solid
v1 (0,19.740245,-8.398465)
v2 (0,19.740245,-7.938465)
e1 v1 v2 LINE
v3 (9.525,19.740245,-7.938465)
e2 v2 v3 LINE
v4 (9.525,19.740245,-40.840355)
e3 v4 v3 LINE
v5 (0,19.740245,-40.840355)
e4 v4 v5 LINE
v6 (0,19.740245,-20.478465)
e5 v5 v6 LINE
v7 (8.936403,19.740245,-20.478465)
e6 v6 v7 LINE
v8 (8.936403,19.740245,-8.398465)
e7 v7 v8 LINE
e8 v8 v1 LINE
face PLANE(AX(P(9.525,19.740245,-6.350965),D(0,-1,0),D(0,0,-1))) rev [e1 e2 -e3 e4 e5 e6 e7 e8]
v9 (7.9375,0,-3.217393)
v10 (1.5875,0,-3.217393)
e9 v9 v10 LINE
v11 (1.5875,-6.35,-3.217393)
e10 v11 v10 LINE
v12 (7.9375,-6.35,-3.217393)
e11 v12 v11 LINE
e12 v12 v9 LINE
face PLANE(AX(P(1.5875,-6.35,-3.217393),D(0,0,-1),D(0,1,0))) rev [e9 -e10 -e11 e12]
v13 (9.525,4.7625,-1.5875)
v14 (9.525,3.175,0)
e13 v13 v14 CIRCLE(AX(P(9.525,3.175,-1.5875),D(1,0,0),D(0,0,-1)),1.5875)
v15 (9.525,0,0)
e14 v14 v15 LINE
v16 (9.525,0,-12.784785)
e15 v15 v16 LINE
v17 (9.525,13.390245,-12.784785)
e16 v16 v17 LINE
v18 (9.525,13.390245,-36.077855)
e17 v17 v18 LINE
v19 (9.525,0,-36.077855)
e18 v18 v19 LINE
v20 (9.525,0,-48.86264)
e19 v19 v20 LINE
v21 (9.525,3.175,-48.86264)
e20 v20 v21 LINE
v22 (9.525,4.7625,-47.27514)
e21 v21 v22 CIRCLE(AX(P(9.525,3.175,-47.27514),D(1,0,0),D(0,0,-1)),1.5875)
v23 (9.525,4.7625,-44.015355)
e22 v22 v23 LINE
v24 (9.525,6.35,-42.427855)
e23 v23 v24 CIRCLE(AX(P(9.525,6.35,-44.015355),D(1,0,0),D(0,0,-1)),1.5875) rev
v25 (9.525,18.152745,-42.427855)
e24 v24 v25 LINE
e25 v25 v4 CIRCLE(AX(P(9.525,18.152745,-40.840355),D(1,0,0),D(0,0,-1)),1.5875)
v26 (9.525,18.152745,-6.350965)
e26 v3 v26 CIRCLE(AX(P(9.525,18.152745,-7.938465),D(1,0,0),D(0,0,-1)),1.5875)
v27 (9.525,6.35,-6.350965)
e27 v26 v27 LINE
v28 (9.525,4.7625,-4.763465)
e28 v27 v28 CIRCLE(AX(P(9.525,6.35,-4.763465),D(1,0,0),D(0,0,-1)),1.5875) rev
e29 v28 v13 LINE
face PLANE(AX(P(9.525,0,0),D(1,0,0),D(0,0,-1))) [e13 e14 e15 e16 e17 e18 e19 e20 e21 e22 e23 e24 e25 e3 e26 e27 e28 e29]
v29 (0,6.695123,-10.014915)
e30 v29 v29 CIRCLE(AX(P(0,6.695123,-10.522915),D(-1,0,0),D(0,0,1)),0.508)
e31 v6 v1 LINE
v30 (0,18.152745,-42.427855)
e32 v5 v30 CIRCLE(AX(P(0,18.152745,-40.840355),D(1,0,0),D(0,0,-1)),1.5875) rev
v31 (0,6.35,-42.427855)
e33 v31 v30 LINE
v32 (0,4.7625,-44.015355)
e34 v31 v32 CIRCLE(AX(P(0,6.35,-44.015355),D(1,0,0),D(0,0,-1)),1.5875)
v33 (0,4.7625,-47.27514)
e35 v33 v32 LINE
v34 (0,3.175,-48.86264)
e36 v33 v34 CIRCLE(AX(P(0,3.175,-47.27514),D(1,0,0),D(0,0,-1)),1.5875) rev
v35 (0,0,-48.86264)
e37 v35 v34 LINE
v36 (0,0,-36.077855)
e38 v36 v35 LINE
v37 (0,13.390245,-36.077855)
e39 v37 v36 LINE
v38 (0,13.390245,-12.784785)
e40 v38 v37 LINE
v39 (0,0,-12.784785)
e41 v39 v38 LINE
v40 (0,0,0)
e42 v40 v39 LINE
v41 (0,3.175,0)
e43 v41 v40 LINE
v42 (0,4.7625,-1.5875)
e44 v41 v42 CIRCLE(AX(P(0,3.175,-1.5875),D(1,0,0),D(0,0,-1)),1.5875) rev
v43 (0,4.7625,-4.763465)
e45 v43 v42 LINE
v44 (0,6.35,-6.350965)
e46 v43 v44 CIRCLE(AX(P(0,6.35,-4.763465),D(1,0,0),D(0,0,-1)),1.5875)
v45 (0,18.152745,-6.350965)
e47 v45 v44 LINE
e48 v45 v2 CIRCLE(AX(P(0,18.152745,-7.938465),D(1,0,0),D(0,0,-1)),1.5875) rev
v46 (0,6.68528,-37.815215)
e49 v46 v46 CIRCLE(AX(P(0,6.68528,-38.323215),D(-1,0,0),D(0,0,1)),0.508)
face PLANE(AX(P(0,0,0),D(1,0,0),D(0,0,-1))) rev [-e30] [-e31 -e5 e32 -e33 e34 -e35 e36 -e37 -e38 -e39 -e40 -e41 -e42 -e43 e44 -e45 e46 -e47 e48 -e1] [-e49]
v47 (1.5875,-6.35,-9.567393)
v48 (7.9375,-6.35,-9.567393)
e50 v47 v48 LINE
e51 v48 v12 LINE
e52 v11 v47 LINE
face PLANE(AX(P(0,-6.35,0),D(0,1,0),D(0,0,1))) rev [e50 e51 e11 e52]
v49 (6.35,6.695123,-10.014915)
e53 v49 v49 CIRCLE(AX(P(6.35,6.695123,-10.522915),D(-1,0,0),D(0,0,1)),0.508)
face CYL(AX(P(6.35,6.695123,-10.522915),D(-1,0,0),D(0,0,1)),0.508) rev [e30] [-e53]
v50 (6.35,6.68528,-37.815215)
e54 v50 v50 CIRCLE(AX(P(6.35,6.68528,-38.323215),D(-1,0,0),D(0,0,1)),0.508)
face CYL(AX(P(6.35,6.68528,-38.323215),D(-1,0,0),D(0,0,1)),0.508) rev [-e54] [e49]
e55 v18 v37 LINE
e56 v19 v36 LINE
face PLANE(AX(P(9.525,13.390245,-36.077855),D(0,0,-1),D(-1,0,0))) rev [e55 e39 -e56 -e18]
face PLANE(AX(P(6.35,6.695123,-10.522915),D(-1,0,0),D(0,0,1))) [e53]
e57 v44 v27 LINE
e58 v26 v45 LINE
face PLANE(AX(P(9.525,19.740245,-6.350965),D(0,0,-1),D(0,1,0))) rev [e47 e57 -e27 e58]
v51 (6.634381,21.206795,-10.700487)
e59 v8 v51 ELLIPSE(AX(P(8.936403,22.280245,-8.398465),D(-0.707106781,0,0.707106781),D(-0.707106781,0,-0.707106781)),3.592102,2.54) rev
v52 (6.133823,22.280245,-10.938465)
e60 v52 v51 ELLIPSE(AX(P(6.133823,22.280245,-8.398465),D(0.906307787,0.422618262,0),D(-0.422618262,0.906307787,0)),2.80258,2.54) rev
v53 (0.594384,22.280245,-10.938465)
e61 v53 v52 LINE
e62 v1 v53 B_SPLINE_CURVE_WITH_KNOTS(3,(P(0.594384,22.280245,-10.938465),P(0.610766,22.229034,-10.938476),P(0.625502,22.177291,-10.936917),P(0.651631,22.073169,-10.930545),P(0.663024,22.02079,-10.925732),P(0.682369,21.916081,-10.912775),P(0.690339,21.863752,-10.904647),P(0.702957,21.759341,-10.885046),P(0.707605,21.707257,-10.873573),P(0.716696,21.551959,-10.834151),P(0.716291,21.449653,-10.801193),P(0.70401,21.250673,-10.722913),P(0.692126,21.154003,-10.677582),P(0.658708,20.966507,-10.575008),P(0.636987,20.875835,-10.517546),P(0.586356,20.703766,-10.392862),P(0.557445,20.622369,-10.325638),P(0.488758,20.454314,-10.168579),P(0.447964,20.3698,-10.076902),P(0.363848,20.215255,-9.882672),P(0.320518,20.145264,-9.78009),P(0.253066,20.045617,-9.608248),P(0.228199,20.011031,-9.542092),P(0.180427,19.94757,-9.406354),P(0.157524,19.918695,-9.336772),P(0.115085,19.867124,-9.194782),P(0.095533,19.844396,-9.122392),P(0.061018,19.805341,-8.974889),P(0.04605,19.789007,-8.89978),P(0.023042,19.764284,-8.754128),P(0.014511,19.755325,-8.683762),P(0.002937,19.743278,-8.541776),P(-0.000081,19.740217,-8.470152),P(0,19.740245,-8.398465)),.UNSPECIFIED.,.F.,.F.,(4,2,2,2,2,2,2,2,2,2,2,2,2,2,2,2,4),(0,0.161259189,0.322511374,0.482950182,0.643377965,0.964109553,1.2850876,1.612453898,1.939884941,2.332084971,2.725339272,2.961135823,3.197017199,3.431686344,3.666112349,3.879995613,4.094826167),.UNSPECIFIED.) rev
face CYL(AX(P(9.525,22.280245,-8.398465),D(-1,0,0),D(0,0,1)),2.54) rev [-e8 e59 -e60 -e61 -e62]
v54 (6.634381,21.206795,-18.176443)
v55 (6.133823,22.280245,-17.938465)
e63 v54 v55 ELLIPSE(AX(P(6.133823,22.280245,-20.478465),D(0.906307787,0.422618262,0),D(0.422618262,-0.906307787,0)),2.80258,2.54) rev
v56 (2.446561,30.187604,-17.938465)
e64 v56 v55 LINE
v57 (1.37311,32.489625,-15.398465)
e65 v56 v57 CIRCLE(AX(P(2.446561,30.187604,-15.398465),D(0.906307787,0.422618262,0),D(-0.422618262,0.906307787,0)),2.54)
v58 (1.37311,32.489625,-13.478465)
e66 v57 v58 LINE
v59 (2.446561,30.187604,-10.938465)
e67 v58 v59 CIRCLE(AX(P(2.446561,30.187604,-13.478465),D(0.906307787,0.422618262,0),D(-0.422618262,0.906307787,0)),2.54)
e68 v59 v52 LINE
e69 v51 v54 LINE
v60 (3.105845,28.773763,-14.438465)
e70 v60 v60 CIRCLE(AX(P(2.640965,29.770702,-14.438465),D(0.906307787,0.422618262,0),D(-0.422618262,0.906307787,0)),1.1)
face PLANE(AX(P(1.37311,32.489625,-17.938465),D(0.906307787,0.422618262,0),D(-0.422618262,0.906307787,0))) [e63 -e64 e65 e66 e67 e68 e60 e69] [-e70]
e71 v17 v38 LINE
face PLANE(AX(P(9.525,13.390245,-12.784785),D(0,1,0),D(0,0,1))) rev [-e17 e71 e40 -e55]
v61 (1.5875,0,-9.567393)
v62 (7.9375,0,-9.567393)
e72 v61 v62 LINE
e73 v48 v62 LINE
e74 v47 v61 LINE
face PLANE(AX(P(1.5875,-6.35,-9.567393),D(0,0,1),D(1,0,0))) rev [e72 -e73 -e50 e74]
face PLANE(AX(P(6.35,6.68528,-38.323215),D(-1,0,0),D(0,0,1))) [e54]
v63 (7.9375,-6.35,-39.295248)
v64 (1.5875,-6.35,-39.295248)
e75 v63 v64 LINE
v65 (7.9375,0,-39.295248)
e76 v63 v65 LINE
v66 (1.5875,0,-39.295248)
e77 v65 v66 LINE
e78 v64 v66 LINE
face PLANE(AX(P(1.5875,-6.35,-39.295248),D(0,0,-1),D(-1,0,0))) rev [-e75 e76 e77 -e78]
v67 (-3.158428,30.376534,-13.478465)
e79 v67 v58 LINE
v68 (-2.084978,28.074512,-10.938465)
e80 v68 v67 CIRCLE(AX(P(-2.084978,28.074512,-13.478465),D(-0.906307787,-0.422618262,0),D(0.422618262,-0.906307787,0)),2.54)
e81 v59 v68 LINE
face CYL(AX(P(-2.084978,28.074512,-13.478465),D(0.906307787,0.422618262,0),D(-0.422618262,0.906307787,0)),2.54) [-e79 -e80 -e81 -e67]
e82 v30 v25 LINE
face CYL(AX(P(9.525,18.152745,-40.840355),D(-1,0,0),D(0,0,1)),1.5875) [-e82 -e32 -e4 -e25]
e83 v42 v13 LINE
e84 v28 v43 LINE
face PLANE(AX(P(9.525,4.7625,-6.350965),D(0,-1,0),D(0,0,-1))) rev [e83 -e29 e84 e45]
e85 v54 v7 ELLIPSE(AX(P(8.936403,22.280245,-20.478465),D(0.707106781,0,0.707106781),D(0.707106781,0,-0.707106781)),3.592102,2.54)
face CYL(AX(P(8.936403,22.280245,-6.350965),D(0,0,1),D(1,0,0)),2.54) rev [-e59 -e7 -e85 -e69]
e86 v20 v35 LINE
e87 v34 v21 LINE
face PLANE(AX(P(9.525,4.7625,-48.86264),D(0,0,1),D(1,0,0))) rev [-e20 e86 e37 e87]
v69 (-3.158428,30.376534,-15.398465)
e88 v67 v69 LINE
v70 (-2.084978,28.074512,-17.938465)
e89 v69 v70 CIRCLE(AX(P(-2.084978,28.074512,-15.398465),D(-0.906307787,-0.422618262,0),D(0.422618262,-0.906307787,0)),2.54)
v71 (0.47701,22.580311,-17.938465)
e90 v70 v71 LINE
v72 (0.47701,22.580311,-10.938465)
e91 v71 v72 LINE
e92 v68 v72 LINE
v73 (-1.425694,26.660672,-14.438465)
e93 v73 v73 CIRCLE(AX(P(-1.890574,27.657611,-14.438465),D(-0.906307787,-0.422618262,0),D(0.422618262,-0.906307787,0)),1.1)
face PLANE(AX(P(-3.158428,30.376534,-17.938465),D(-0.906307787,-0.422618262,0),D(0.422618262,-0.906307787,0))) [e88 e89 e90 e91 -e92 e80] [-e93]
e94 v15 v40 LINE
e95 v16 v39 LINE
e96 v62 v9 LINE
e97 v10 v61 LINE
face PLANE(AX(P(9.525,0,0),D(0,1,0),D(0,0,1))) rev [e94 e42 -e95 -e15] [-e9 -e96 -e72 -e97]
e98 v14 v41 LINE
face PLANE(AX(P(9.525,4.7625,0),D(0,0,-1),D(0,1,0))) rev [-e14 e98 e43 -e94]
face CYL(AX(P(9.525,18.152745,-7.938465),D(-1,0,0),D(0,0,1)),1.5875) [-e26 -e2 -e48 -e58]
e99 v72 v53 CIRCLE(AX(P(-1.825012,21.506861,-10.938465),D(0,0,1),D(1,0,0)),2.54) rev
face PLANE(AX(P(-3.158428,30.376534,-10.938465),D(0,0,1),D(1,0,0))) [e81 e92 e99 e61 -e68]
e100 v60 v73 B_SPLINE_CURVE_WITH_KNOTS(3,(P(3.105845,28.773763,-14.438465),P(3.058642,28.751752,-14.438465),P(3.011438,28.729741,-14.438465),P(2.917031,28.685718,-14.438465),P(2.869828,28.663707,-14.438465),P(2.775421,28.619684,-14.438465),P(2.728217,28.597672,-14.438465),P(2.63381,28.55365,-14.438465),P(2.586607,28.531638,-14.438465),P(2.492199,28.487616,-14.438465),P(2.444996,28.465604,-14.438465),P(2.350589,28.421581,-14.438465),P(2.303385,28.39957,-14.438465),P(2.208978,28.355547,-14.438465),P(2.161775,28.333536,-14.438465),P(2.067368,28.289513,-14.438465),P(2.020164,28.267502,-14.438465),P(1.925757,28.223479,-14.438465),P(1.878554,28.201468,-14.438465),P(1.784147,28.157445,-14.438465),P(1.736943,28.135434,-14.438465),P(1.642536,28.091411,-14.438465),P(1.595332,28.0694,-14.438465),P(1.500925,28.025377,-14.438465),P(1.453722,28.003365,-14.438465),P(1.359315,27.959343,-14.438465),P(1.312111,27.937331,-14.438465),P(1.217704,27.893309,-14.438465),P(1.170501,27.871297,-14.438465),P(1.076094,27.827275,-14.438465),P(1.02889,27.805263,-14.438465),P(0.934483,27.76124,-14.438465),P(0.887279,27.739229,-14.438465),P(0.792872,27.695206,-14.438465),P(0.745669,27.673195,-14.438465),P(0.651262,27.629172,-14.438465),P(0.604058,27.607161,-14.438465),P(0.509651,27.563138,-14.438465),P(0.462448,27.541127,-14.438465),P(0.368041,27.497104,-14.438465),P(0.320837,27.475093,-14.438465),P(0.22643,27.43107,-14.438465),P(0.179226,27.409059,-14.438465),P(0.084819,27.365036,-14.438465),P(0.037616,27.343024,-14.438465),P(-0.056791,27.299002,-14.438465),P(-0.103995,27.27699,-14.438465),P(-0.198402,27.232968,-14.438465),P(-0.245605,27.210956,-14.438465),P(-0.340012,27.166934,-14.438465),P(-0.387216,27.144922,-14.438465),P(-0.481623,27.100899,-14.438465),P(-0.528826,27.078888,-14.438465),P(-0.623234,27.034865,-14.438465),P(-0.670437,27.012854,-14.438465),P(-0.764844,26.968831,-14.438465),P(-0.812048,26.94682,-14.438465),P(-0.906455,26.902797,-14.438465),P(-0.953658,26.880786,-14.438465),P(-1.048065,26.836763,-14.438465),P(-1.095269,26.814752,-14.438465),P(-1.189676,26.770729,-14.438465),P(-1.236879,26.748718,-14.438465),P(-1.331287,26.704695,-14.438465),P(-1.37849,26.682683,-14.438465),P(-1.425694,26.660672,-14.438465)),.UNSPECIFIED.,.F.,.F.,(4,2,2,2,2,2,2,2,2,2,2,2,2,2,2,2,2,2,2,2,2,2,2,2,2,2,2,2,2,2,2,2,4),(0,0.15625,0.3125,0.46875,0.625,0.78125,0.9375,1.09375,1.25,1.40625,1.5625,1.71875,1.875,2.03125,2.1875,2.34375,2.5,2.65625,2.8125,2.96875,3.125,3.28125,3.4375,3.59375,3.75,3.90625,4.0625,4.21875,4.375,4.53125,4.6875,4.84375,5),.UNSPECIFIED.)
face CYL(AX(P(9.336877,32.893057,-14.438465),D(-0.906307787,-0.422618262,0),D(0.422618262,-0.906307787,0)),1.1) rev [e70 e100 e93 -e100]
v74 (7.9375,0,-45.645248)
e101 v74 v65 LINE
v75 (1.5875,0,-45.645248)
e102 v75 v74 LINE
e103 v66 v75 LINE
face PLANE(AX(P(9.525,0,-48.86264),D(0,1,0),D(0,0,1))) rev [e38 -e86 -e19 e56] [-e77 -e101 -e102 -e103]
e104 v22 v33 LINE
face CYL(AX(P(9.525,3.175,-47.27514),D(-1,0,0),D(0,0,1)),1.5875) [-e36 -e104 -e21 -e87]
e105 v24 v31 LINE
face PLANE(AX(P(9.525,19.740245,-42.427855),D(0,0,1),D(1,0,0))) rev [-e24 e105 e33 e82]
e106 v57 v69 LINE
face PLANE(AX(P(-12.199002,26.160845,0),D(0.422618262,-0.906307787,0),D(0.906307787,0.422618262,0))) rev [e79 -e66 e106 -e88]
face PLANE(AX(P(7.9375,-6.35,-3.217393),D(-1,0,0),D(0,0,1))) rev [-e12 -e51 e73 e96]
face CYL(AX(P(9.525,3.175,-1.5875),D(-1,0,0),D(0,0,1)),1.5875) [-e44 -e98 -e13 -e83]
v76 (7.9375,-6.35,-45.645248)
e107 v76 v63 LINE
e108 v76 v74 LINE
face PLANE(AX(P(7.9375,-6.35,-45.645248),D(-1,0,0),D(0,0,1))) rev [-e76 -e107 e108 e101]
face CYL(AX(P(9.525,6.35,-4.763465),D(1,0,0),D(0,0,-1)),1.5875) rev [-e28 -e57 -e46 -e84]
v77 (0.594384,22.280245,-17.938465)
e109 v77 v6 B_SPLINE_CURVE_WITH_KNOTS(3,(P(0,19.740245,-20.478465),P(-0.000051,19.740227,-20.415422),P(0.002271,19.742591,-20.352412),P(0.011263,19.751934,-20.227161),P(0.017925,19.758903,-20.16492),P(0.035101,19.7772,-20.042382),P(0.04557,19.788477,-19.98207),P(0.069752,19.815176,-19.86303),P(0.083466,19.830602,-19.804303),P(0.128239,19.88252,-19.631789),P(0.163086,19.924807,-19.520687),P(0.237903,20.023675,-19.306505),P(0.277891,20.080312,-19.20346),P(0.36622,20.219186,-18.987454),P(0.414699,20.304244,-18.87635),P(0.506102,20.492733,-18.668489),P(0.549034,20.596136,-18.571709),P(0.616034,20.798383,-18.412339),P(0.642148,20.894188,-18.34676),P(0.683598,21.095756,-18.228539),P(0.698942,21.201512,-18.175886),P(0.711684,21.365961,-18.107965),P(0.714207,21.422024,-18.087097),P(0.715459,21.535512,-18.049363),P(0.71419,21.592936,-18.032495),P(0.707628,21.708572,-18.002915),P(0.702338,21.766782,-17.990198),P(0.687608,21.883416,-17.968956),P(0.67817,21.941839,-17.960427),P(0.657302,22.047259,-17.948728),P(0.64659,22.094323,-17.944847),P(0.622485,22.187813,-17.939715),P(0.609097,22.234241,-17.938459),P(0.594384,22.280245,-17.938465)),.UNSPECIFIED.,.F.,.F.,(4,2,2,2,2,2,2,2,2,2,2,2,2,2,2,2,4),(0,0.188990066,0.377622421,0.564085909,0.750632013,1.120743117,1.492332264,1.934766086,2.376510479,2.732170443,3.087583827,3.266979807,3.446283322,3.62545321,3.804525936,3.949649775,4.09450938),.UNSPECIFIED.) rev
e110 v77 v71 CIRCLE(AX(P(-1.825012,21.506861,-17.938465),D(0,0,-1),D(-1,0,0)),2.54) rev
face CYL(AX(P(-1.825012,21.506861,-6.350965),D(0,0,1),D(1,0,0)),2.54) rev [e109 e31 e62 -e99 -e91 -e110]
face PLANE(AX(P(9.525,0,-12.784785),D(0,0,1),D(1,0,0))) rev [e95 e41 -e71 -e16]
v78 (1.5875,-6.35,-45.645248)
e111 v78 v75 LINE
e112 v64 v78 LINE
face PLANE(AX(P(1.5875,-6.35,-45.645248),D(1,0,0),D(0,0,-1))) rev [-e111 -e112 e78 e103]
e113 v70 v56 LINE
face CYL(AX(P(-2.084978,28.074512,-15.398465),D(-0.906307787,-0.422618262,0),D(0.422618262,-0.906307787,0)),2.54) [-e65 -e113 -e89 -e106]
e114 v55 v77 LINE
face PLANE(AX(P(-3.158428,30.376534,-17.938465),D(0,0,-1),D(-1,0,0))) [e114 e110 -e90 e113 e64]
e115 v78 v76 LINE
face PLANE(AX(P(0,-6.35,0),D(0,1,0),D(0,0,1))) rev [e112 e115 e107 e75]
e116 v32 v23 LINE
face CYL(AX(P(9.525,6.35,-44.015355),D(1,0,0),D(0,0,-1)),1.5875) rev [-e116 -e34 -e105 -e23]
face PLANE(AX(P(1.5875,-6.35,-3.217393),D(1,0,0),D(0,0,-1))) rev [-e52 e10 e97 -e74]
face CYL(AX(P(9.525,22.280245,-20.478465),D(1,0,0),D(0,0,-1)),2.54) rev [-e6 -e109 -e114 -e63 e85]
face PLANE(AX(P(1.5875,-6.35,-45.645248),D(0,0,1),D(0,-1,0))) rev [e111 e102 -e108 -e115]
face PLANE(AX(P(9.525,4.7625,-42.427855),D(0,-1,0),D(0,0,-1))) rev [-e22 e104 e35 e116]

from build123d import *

# Parameters (mm, degrees)
BOSS_EXTRUDE1_DEPTH     = 9.525
SKETCH3_R               = 0.508
CUT_EXTRUDE2_DEPTH      = 6.35
FILLET1_R               = 1.5875
ESQUISSE1_W             = 6.35
ESQUISSE1_H             = 6.35
BOSS_EXTRU_1_DEPTH      = 6.35
ESQUISSE2_W             = 7
ESQUISSE2_H             = 5
BOSS_EXTRU_2_DEPTH      = 15
ESQUISSE3_R             = 1.1
ENL_V_MAT_EXTRU_1_DEPTH = 58.756287679
CONG_1_R                = 2.54


with BuildPart() as part:
    # Sketch1 → Boss-Extrude1 (new body)
    with BuildSketch(Plane(origin=(0, 0, 0), x_dir=(0, 0, -1), z_dir=(1, 0, 0))):
        Polygon((0, 0), (12.7847852, 0), (12.7847852, 13.390245), (36.0778552, 13.390245), (36.0778552, 0), (48.8626404, 0), (48.8626404, 4.7625), (42.4278552, 4.7625), (42.4278552, 19.740245), (41.4309052, 19.740245), (6.3509652, 19.740245), (6.3509652, 4.7625), (0, 4.7625), align=None)
    extrude(amount=BOSS_EXTRUDE1_DEPTH)

    # Sketch3 → Cut-Extrude2 (cut)
    with BuildSketch(Plane.ZY):
        with Locations((-38.3232152, 6.68528)):
            Circle(SKETCH3_R)
        with Locations((-10.5229152, 6.6951225)):
            Circle(SKETCH3_R)
    extrude(amount=-CUT_EXTRUDE2_DEPTH, mode=Mode.SUBTRACT)

    # Fillet1
    fillet1_edges = [part.edges().sort_by_distance(p)[0] for p in [
        (4.7625, 4.7625, 0),
        (4.7625, 4.7625, -6.3509652),
        (4.7625, 19.740245, -6.3509652),
        (4.7625, 19.740245, -42.4278552),
        (4.7625, 4.7625, -42.4278552),
        (4.7625, 4.7625, -48.8626404),
    ]]
    fillet(fillet1_edges, radius=FILLET1_R)

    # Esquisse1 → Boss.-Extru.1 (add)
    with BuildSketch(Plane.XZ):
        with Locations((4.7625, -42.4702478)):
            Rectangle(ESQUISSE1_W, ESQUISSE1_H)
        with Locations((4.7625, -6.3923926)):
            Rectangle(ESQUISSE1_W, ESQUISSE1_H)
    extrude(amount=BOSS_EXTRU_1_DEPTH)

    # Esquisse2 → Boss.-Extru.2 (add)
    with BuildSketch(Plane(origin=(-5.859728485, 12.566228289, 0), x_dir=(0, 0, 1), z_dir=(0.4226182617389464, -0.9063077870374674, 0))):
        with Locations((-14.4384652, -12.4751697)):
            Rectangle(ESQUISSE2_W, ESQUISSE2_H)
    extrude(amount=-BOSS_EXTRU_2_DEPTH)

    # Esquisse3 → Enlèv. mat.-Extru.1 (cut, through all)
    with BuildSketch(Plane(origin=(9.040573976, 4.215688879, 0), x_dir=(0, 0, 1), z_dir=(-0.9063077870367755, -0.4226182617404302, 0))):
        with Locations(Location((-14.4384652, 25.865298818, 0), (0, 0, 270))):
            Circle(ESQUISSE3_R)
    extrude(amount=-ENL_V_MAT_EXTRU_1_DEPTH, mode=Mode.SUBTRACT)

    # Congé1
    # the kernel refuses this fillet: 2.54 mm, written as the material it adds along each edge
    with BuildSketch(Plane(origin=(7.318244162, 19.740245, -10.9384652), x_dir=(1, 0, 0), z_dir=(0, 0, -1))) as cong_1_piece_1:
        with BuildLine():
            CenterArc((CONG_1_R * 0.637070260809, -CONG_1_R), CONG_1_R, 90, 65)
            Line((-CONG_1_R * 0.269237526229, -CONG_1_R * 0.577381738261), (0, 0))
            Line((0, 0), (CONG_1_R * 0.637070260809, 0))
        make_face()
    extrude(amount=7)
    with BuildSketch(Plane(origin=(-4.548645433, 19.740245, -10.9384652), x_dir=(0, 0, 1), z_dir=(1, 0, 0))) as cong_1_piece_2_section:
        with BuildLine():
            CenterArc((CONG_1_R, -CONG_1_R), CONG_1_R, 90, 90)
            Line((0, -CONG_1_R), (0, 0))
            Line((0, 0), (CONG_1_R, 0))
        make_face()
    cong_1_piece_2 = extrude(amount=18.216889595, mode=Mode.PRIVATE)
    cong_1_piece_2 = split(cong_1_piece_2, bisect_by=Plane(origin=(5.198744163, 24.285527416, -10.9384652), z_dir=(-0.9063077870374674, -0.4226182617389464, 0)), keep=Keep.TOP, mode=Mode.PRIVATE)
    cong_1_piece_2 = split(cong_1_piece_2, bisect_by=Plane(origin=(0.667205228, 22.172436107, -10.9384652), z_dir=(0.9063077870374674, 0.4226182617389464, 0)), keep=Keep.TOP, mode=Mode.PRIVATE)
    add(cong_1_piece_2)
    with BuildSketch(Plane(origin=(1.801354567, 19.740245, -17.9384652), x_dir=(-1, 0, 0), z_dir=(0, 0, 1))) as cong_1_piece_3:
        with BuildLine():
            CenterArc((3.626366432, -1.766615888), CONG_1_R, 135.931485235, 69.068514765)
            Line((1.324344653, -2.840066273), (0, 0))
            Line((0, 0), (1.801354567, 0))
        make_face()
    extrude(amount=7)
    with BuildSketch(Plane(origin=(13.668244162, 19.740245, -17.9384652), x_dir=(0, 0, -1), z_dir=(-1, 0, 0))) as cong_1_piece_4_section:
        with BuildLine():
            CenterArc((CONG_1_R, -CONG_1_R), CONG_1_R, 90, 90)
            Line((0, -CONG_1_R), (0, 0))
            Line((0, 0), (CONG_1_R, 0))
        make_face()
    cong_1_piece_4 = extrude(amount=18.216889595, mode=Mode.PRIVATE)
    cong_1_piece_4 = split(cong_1_piece_4, bisect_by=Plane(origin=(8.452393501, 17.308053893, -17.9384652), z_dir=(-0.9063077870374674, -0.4226182617389464, 0)), keep=Keep.TOP, mode=Mode.PRIVATE)
    cong_1_piece_4 = split(cong_1_piece_4, bisect_by=Plane(origin=(3.920854566, 15.194962584, -17.9384652), z_dir=(0.9063077870374674, 0.4226182617389464, 0)), keep=Keep.TOP, mode=Mode.PRIVATE)
    add(cong_1_piece_4)
    with BuildSketch(Plane(origin=(7.318244162, 19.740245, -6.893069044), x_dir=(1, 0, 0), z_dir=(0, 0, -1))) as cong_1_piece_5a_section:
        with BuildLine():
            CenterArc((CONG_1_R * 0.637070260809, -CONG_1_R), CONG_1_R, 90, 65)
            Line((-CONG_1_R * 0.269237526229, -CONG_1_R * 0.577381738261), (0, 0))
            Line((0, 0), (CONG_1_R * 0.637070260809, 0))
        make_face()
    cong_1_piece_5a = extrude(amount=11.045396156, mode=Mode.PRIVATE)
    cong_1_piece_5a = split(cong_1_piece_5a, bisect_by=Plane(origin=(7.318244162, 19.740245, -10.9384652), z_dir=(0, 0, 1)), keep=Keep.TOP, mode=Mode.PRIVATE)
    with BuildSketch(Plane(origin=(-4.548645433, 19.740245, -10.9384652), x_dir=(0, 0, 1), z_dir=(1, 0, 0))) as cong_1_piece_5b_section:
        with BuildLine():
            CenterArc((CONG_1_R, -CONG_1_R), CONG_1_R, 90, 90)
            Line((0, -CONG_1_R), (0, 0))
            Line((0, 0), (CONG_1_R, 0))
        make_face()
    cong_1_piece_5b = extrude(amount=18.216889595, mode=Mode.PRIVATE)
    cong_1_piece_5b = split(cong_1_piece_5b, bisect_by=Plane(origin=(9.525, 19.740245, -10.9384652), z_dir=(-1, 0, 0)), keep=Keep.TOP, mode=Mode.PRIVATE)
    cong_1_piece_5b = split(cong_1_piece_5b, bisect_by=Plane(origin=(5.198744163, 24.285527416, -10.9384652), z_dir=(0.9063077870374674, 0.4226182617389464, 0)), keep=Keep.TOP, mode=Mode.PRIVATE)
    cong_1_piece_5 = cong_1_piece_5a & cong_1_piece_5b
    add(cong_1_piece_5)
    with BuildSketch(Plane(origin=(13.668244162, 19.740245, -17.9384652), x_dir=(0, 0, -1), z_dir=(-1, 0, 0))) as cong_1_piece_6a_section:
        with BuildLine():
            CenterArc((CONG_1_R, -CONG_1_R), CONG_1_R, 90, 90)
            Line((0, -CONG_1_R), (0, 0))
            Line((0, 0), (CONG_1_R, 0))
        make_face()
    cong_1_piece_6a = extrude(amount=18.216889595, mode=Mode.PRIVATE)
    cong_1_piece_6a = split(cong_1_piece_6a, bisect_by=Plane(origin=(9.525, 19.740245, -17.9384652), z_dir=(-1, 0, 0)), keep=Keep.TOP, mode=Mode.PRIVATE)
    cong_1_piece_6a = split(cong_1_piece_6a, bisect_by=Plane(origin=(8.452393501, 17.308053893, -17.9384652), z_dir=(0.9063077870374674, 0.4226182617389464, 0)), keep=Keep.TOP, mode=Mode.PRIVATE)
    with BuildSketch(Plane(origin=(7.318244162, 19.740245, -10.9384652), x_dir=(1, 0, 0), z_dir=(0, 0, -1))) as cong_1_piece_6b_section:
        with BuildLine():
            CenterArc((CONG_1_R * 0.637070260809, -CONG_1_R), CONG_1_R, 90, 65)
            Line((-CONG_1_R * 0.269237526229, -CONG_1_R * 0.577381738261), (0, 0))
            Line((0, 0), (CONG_1_R * 0.637070260809, 0))
        make_face()
    cong_1_piece_6b = extrude(amount=11.045396156, mode=Mode.PRIVATE)
    cong_1_piece_6b = split(cong_1_piece_6b, bisect_by=Plane(origin=(7.318244162, 19.740245, -17.9384652), z_dir=(0, 0, -1)), keep=Keep.TOP, mode=Mode.PRIVATE)
    cong_1_piece_6 = cong_1_piece_6a & cong_1_piece_6b
    add(cong_1_piece_6)
    with BuildSketch(Plane(origin=(-4.548645433, 19.740245, -10.9384652), x_dir=(0, 0, 1), z_dir=(1, 0, 0))) as cong_1_piece_7a_section:
        with BuildLine():
            CenterArc((CONG_1_R, -CONG_1_R), CONG_1_R, 90, 90)
            Line((0, -CONG_1_R), (0, 0))
            Line((0, 0), (CONG_1_R, 0))
        make_face()
    cong_1_piece_7a = extrude(amount=18.216889595, mode=Mode.PRIVATE)
    cong_1_piece_7a = split(cong_1_piece_7a, bisect_by=Plane(origin=(0, 19.740245, -10.9384652), z_dir=(1, 0, 0)), keep=Keep.TOP, mode=Mode.PRIVATE)
    cong_1_piece_7a = split(cong_1_piece_7a, bisect_by=Plane(origin=(0.667205228, 22.172436107, -10.9384652), z_dir=(-0.9063077870374674, -0.4226182617389464, 0)), keep=Keep.TOP, mode=Mode.PRIVATE)
    with BuildSketch(Plane(origin=(1.801354567, 19.740245, -17.9384652), x_dir=(-1, 0, 0), z_dir=(0, 0, 1))) as cong_1_piece_7b_section:
        with BuildLine():
            CenterArc((3.626366432, -1.766615888), CONG_1_R, 135.931485235, 69.068514765)
            Line((1.324344653, -2.840066273), (0, 0))
            Line((0, 0), (1.801354567, 0))
        make_face()
    cong_1_piece_7b = extrude(amount=14.834166034, mode=Mode.PRIVATE)
    cong_1_piece_7b = split(cong_1_piece_7b, bisect_by=Plane(origin=(1.801354567, 19.740245, -10.9384652), z_dir=(0, 0, 1)), keep=Keep.TOP, mode=Mode.PRIVATE)
    cong_1_piece_7 = cong_1_piece_7a & cong_1_piece_7b
    add(cong_1_piece_7)
    with BuildSketch(Plane(origin=(13.668244162, 19.740245, -17.9384652), x_dir=(0, 0, -1), z_dir=(-1, 0, 0))) as cong_1_piece_8a_section:
        with BuildLine():
            CenterArc((CONG_1_R, -CONG_1_R), CONG_1_R, 90, 90)
            Line((0, -CONG_1_R), (0, 0))
            Line((0, 0), (CONG_1_R, 0))
        make_face()
    cong_1_piece_8a = extrude(amount=18.216889595, mode=Mode.PRIVATE)
    cong_1_piece_8a = split(cong_1_piece_8a, bisect_by=Plane(origin=(0, 19.740245, -17.9384652), z_dir=(1, 0, 0)), keep=Keep.TOP, mode=Mode.PRIVATE)
    cong_1_piece_8a = split(cong_1_piece_8a, bisect_by=Plane(origin=(3.920854566, 15.194962584, -17.9384652), z_dir=(-0.9063077870374674, -0.4226182617389464, 0)), keep=Keep.TOP, mode=Mode.PRIVATE)
    with BuildSketch(Plane(origin=(1.801354567, 19.740245, -25.772631234), x_dir=(-1, 0, 0), z_dir=(0, 0, 1))) as cong_1_piece_8b_section:
        with BuildLine():
            CenterArc((3.626366432, -1.766615888), CONG_1_R, 135.931485235, 69.068514765)
            Line((1.324344653, -2.840066273), (0, 0))
            Line((0, 0), (1.801354567, 0))
        make_face()
    cong_1_piece_8b = extrude(amount=14.834166034, mode=Mode.PRIVATE)
    cong_1_piece_8b = split(cong_1_piece_8b, bisect_by=Plane(origin=(1.801354567, 19.740245, -17.9384652), z_dir=(0, 0, -1)), keep=Keep.TOP, mode=Mode.PRIVATE)
    cong_1_piece_8 = cong_1_piece_8a & cong_1_piece_8b
    add(cong_1_piece_8)
    # the kernel refuses this fillet: 2.54 mm, written as the material it takes off along each edge
    with BuildSketch(Plane(origin=(7.128164948, 35.173251244, -17.9384652), x_dir=(0, 0, 1), z_dir=(-0.9063077870374675, -0.42261826173894645, 0)), Plane(origin=(-8.913482883, 27.692908011, -10.9384652), x_dir=(0, 0, -1), z_dir=(0.9063077870374675, 0.42261826173894645, 0))) as cong_1_2_piece_1:
        with BuildLine():
            CenterArc((CONG_1_R, -CONG_1_R), CONG_1_R, 90, 90)
            Line((0, -CONG_1_R), (0, 0))
            Line((0, 0), (CONG_1_R, 0))
        make_face()
    extrude(amount=17.7, mode=Mode.SUBTRACT)


solid = part.part
